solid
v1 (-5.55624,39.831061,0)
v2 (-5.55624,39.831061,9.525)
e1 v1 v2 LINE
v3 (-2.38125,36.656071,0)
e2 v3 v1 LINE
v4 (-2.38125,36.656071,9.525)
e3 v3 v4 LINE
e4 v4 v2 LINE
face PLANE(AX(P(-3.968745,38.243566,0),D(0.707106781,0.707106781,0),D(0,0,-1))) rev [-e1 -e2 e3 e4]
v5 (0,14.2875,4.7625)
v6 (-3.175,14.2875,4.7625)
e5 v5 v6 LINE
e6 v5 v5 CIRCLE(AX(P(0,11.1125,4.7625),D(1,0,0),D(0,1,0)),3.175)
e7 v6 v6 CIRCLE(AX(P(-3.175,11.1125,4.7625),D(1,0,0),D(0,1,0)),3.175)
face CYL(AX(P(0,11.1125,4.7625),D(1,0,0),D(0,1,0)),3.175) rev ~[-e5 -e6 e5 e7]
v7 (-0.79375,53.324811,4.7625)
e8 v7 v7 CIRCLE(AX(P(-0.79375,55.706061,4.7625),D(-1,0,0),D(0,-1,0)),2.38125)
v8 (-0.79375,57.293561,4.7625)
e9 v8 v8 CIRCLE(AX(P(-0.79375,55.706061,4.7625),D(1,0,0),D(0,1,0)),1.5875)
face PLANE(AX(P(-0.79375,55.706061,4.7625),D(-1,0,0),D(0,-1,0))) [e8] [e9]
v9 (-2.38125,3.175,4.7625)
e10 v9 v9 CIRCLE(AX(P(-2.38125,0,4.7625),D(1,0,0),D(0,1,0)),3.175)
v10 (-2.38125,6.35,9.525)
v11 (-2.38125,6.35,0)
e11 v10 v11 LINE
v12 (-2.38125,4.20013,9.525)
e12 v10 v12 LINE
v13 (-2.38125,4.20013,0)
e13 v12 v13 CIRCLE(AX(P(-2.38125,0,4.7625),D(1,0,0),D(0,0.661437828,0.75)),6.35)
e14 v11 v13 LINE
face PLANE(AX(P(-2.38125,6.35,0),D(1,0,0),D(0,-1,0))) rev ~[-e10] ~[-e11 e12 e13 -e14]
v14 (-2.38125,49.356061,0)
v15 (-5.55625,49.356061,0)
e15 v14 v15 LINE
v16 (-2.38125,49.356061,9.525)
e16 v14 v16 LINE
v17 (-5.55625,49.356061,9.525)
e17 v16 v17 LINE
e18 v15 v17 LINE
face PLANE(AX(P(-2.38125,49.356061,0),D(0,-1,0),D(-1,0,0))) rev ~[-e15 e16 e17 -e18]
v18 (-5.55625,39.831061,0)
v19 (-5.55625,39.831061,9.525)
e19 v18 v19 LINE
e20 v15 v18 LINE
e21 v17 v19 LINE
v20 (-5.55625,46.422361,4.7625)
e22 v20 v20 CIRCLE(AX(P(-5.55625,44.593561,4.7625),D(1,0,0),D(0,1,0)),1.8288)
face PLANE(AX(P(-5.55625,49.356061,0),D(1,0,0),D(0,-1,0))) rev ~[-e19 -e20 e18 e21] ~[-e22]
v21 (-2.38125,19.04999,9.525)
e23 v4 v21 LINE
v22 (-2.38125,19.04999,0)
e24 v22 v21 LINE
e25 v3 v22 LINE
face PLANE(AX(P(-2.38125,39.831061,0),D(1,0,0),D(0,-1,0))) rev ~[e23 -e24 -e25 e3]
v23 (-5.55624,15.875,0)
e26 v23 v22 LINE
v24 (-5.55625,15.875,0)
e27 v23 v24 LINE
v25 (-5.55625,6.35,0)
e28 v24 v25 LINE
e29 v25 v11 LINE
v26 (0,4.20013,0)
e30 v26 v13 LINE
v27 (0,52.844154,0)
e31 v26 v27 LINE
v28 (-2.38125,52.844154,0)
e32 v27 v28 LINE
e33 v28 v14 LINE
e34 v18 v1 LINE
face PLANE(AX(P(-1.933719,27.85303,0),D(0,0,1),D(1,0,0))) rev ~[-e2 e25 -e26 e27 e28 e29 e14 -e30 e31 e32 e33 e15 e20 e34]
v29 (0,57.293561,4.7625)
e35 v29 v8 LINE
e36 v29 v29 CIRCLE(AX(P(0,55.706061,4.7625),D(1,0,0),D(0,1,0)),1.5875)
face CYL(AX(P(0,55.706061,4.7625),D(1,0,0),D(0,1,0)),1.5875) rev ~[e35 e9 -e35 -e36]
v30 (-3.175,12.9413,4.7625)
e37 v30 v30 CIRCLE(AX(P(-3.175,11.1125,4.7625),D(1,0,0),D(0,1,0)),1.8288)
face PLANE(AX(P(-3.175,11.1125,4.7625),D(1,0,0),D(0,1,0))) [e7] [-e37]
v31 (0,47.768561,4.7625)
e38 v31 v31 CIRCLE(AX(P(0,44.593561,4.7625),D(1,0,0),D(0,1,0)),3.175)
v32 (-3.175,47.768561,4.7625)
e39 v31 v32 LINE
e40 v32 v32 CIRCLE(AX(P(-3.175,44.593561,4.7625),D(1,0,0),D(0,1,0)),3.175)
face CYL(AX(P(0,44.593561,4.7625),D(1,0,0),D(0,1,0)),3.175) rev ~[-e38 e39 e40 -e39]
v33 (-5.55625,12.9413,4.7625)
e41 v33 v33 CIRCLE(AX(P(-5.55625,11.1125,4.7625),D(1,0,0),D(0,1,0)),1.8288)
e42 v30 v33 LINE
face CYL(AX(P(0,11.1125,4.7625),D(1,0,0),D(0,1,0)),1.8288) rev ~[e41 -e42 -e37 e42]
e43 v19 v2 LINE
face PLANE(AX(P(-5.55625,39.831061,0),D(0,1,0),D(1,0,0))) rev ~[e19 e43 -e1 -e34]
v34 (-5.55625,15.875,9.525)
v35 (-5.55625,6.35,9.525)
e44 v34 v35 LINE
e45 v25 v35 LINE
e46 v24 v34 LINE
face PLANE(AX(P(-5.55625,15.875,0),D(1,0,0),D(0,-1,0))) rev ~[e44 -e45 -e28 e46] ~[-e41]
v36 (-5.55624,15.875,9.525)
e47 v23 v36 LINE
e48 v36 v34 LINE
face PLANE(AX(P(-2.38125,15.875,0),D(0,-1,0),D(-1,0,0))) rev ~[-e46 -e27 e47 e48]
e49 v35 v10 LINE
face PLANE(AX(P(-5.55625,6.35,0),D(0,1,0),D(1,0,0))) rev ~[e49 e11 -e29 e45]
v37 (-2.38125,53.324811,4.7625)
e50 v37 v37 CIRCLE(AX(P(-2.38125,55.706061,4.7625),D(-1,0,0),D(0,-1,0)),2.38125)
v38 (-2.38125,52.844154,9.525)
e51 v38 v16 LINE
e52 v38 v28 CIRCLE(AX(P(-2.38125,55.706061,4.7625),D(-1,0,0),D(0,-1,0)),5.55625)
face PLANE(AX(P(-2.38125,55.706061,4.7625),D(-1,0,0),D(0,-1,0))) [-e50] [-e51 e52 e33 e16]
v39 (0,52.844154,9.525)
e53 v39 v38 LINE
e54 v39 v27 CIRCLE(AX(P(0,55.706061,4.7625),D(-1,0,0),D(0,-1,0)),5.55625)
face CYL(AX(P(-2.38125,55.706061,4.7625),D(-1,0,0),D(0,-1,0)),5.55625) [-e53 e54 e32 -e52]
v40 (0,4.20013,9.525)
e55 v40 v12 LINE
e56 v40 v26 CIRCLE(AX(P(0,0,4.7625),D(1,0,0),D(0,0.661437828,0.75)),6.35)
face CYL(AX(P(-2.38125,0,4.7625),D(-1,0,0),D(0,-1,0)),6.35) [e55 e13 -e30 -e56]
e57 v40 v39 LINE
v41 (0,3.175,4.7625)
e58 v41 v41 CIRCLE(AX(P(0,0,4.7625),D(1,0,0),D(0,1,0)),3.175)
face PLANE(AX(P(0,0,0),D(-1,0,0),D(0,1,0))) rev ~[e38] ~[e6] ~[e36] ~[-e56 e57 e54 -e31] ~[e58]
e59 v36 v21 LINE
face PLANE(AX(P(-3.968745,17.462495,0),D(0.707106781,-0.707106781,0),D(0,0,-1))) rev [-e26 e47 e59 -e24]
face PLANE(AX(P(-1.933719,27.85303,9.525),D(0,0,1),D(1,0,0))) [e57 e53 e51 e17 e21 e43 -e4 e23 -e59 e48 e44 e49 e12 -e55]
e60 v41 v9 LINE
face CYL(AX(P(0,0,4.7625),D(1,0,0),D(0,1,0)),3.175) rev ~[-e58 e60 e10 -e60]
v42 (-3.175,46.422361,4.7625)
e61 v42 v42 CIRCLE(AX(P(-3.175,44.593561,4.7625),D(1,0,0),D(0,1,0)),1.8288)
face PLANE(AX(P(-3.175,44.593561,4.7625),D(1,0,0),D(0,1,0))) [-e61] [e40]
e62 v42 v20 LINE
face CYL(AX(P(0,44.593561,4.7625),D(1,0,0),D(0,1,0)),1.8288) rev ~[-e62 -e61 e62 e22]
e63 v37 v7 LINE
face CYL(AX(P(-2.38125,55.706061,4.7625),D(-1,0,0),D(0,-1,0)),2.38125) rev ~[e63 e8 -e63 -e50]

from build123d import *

# Parameters (mm, degrees)
F1_DEPTH  = 9.525
F2_R      = 5.55625
F2_R_2    = 6.35
F3_DEPTH  = 2.38125
F4_R      = 3.175
F4_R_2    = 1.8288
F4_R_3    = 1.5875
F5_DEPTH  = 5.55625
F6_R      = 2.38125
F7_DEPTH  = 1.5875
F8_SIZE   = 3.17499
F9_R      = 3.175
F10_DEPTH = 3.175


# Not quite as in the source:
# - a fillet or chamfer is up to 0.001 mm smaller than in the source, because OpenCascade refuses the exact size


with BuildPart() as f1:
    # F0 (on Top) → F1 (new body)
    with BuildSketch(Plane.XY):
        Polygon((0, 0), (0, 55.7060608), (-2.38125, 55.7060608), (-2.38125, 49.3560608), (-5.55625, 49.3560608), (-5.55625, 39.8310608), (-2.38125, 39.8310608), (-2.38125, 15.875), (-5.55625, 15.875), (-5.55625, 6.35), (-2.38125, 6.35), (-2.38125, 0), align=None)
    extrude(amount=F1_DEPTH)

    # F2 (on face) → F3 (join, through all)
    with BuildSketch(Plane(origin=(-2.38125, 0, 0), x_dir=(0, -1, 0), z_dir=(-1, 0, 0))):
        with Locations((-55.7060608, 4.7625)):
            Circle(F2_R)
        with Locations((0, 4.7625)):
            Circle(F2_R_2)
    extrude(amount=-F3_DEPTH)

    # F4 (on face) → F5 (cut, through all)
    with BuildSketch(Plane.YZ):
        with Locations((0, 4.7625)):
            Circle(F4_R)
        with Locations((11.1125, 4.7625)):
            Circle(F4_R_2)
        with Locations((44.5935608, 4.7625)):
            Circle(F4_R_2)
        with Locations((55.7060608001, 4.7625)):
            Circle(F4_R_3)
    extrude(amount=-F5_DEPTH, mode=Mode.SUBTRACT)

    # F6 (on face) → F7 (cut)
    with BuildSketch(Plane(origin=(-2.38125, 0, 0), x_dir=(0, -1, 0), z_dir=(-1, 0, 0))):
        with Locations((-55.7060608, 4.7625)):
            Circle(F6_R)
    extrude(amount=-F7_DEPTH, mode=Mode.SUBTRACT)

    # F8 (size 3.175 in the source; OpenCascade refuses exactly that, so slightly less here)
    f8_edges = [f1.edges().sort_by_distance(p)[0] for p in [
        (-2.38125, 39.831061, 4.7625),
        (-2.38125, 15.875, 4.7625),
    ]]
    chamfer(f8_edges, length=F8_SIZE)

    # F9 (on face) → F10 (cut)
    with BuildSketch(Plane.YZ):
        with Locations((11.1125, 4.7625)):
            Circle(F9_R)
        with Locations((44.5935608, 4.7625)):
            Circle(F9_R)
    extrude(amount=-F10_DEPTH, mode=Mode.SUBTRACT)


solid = f1.part
